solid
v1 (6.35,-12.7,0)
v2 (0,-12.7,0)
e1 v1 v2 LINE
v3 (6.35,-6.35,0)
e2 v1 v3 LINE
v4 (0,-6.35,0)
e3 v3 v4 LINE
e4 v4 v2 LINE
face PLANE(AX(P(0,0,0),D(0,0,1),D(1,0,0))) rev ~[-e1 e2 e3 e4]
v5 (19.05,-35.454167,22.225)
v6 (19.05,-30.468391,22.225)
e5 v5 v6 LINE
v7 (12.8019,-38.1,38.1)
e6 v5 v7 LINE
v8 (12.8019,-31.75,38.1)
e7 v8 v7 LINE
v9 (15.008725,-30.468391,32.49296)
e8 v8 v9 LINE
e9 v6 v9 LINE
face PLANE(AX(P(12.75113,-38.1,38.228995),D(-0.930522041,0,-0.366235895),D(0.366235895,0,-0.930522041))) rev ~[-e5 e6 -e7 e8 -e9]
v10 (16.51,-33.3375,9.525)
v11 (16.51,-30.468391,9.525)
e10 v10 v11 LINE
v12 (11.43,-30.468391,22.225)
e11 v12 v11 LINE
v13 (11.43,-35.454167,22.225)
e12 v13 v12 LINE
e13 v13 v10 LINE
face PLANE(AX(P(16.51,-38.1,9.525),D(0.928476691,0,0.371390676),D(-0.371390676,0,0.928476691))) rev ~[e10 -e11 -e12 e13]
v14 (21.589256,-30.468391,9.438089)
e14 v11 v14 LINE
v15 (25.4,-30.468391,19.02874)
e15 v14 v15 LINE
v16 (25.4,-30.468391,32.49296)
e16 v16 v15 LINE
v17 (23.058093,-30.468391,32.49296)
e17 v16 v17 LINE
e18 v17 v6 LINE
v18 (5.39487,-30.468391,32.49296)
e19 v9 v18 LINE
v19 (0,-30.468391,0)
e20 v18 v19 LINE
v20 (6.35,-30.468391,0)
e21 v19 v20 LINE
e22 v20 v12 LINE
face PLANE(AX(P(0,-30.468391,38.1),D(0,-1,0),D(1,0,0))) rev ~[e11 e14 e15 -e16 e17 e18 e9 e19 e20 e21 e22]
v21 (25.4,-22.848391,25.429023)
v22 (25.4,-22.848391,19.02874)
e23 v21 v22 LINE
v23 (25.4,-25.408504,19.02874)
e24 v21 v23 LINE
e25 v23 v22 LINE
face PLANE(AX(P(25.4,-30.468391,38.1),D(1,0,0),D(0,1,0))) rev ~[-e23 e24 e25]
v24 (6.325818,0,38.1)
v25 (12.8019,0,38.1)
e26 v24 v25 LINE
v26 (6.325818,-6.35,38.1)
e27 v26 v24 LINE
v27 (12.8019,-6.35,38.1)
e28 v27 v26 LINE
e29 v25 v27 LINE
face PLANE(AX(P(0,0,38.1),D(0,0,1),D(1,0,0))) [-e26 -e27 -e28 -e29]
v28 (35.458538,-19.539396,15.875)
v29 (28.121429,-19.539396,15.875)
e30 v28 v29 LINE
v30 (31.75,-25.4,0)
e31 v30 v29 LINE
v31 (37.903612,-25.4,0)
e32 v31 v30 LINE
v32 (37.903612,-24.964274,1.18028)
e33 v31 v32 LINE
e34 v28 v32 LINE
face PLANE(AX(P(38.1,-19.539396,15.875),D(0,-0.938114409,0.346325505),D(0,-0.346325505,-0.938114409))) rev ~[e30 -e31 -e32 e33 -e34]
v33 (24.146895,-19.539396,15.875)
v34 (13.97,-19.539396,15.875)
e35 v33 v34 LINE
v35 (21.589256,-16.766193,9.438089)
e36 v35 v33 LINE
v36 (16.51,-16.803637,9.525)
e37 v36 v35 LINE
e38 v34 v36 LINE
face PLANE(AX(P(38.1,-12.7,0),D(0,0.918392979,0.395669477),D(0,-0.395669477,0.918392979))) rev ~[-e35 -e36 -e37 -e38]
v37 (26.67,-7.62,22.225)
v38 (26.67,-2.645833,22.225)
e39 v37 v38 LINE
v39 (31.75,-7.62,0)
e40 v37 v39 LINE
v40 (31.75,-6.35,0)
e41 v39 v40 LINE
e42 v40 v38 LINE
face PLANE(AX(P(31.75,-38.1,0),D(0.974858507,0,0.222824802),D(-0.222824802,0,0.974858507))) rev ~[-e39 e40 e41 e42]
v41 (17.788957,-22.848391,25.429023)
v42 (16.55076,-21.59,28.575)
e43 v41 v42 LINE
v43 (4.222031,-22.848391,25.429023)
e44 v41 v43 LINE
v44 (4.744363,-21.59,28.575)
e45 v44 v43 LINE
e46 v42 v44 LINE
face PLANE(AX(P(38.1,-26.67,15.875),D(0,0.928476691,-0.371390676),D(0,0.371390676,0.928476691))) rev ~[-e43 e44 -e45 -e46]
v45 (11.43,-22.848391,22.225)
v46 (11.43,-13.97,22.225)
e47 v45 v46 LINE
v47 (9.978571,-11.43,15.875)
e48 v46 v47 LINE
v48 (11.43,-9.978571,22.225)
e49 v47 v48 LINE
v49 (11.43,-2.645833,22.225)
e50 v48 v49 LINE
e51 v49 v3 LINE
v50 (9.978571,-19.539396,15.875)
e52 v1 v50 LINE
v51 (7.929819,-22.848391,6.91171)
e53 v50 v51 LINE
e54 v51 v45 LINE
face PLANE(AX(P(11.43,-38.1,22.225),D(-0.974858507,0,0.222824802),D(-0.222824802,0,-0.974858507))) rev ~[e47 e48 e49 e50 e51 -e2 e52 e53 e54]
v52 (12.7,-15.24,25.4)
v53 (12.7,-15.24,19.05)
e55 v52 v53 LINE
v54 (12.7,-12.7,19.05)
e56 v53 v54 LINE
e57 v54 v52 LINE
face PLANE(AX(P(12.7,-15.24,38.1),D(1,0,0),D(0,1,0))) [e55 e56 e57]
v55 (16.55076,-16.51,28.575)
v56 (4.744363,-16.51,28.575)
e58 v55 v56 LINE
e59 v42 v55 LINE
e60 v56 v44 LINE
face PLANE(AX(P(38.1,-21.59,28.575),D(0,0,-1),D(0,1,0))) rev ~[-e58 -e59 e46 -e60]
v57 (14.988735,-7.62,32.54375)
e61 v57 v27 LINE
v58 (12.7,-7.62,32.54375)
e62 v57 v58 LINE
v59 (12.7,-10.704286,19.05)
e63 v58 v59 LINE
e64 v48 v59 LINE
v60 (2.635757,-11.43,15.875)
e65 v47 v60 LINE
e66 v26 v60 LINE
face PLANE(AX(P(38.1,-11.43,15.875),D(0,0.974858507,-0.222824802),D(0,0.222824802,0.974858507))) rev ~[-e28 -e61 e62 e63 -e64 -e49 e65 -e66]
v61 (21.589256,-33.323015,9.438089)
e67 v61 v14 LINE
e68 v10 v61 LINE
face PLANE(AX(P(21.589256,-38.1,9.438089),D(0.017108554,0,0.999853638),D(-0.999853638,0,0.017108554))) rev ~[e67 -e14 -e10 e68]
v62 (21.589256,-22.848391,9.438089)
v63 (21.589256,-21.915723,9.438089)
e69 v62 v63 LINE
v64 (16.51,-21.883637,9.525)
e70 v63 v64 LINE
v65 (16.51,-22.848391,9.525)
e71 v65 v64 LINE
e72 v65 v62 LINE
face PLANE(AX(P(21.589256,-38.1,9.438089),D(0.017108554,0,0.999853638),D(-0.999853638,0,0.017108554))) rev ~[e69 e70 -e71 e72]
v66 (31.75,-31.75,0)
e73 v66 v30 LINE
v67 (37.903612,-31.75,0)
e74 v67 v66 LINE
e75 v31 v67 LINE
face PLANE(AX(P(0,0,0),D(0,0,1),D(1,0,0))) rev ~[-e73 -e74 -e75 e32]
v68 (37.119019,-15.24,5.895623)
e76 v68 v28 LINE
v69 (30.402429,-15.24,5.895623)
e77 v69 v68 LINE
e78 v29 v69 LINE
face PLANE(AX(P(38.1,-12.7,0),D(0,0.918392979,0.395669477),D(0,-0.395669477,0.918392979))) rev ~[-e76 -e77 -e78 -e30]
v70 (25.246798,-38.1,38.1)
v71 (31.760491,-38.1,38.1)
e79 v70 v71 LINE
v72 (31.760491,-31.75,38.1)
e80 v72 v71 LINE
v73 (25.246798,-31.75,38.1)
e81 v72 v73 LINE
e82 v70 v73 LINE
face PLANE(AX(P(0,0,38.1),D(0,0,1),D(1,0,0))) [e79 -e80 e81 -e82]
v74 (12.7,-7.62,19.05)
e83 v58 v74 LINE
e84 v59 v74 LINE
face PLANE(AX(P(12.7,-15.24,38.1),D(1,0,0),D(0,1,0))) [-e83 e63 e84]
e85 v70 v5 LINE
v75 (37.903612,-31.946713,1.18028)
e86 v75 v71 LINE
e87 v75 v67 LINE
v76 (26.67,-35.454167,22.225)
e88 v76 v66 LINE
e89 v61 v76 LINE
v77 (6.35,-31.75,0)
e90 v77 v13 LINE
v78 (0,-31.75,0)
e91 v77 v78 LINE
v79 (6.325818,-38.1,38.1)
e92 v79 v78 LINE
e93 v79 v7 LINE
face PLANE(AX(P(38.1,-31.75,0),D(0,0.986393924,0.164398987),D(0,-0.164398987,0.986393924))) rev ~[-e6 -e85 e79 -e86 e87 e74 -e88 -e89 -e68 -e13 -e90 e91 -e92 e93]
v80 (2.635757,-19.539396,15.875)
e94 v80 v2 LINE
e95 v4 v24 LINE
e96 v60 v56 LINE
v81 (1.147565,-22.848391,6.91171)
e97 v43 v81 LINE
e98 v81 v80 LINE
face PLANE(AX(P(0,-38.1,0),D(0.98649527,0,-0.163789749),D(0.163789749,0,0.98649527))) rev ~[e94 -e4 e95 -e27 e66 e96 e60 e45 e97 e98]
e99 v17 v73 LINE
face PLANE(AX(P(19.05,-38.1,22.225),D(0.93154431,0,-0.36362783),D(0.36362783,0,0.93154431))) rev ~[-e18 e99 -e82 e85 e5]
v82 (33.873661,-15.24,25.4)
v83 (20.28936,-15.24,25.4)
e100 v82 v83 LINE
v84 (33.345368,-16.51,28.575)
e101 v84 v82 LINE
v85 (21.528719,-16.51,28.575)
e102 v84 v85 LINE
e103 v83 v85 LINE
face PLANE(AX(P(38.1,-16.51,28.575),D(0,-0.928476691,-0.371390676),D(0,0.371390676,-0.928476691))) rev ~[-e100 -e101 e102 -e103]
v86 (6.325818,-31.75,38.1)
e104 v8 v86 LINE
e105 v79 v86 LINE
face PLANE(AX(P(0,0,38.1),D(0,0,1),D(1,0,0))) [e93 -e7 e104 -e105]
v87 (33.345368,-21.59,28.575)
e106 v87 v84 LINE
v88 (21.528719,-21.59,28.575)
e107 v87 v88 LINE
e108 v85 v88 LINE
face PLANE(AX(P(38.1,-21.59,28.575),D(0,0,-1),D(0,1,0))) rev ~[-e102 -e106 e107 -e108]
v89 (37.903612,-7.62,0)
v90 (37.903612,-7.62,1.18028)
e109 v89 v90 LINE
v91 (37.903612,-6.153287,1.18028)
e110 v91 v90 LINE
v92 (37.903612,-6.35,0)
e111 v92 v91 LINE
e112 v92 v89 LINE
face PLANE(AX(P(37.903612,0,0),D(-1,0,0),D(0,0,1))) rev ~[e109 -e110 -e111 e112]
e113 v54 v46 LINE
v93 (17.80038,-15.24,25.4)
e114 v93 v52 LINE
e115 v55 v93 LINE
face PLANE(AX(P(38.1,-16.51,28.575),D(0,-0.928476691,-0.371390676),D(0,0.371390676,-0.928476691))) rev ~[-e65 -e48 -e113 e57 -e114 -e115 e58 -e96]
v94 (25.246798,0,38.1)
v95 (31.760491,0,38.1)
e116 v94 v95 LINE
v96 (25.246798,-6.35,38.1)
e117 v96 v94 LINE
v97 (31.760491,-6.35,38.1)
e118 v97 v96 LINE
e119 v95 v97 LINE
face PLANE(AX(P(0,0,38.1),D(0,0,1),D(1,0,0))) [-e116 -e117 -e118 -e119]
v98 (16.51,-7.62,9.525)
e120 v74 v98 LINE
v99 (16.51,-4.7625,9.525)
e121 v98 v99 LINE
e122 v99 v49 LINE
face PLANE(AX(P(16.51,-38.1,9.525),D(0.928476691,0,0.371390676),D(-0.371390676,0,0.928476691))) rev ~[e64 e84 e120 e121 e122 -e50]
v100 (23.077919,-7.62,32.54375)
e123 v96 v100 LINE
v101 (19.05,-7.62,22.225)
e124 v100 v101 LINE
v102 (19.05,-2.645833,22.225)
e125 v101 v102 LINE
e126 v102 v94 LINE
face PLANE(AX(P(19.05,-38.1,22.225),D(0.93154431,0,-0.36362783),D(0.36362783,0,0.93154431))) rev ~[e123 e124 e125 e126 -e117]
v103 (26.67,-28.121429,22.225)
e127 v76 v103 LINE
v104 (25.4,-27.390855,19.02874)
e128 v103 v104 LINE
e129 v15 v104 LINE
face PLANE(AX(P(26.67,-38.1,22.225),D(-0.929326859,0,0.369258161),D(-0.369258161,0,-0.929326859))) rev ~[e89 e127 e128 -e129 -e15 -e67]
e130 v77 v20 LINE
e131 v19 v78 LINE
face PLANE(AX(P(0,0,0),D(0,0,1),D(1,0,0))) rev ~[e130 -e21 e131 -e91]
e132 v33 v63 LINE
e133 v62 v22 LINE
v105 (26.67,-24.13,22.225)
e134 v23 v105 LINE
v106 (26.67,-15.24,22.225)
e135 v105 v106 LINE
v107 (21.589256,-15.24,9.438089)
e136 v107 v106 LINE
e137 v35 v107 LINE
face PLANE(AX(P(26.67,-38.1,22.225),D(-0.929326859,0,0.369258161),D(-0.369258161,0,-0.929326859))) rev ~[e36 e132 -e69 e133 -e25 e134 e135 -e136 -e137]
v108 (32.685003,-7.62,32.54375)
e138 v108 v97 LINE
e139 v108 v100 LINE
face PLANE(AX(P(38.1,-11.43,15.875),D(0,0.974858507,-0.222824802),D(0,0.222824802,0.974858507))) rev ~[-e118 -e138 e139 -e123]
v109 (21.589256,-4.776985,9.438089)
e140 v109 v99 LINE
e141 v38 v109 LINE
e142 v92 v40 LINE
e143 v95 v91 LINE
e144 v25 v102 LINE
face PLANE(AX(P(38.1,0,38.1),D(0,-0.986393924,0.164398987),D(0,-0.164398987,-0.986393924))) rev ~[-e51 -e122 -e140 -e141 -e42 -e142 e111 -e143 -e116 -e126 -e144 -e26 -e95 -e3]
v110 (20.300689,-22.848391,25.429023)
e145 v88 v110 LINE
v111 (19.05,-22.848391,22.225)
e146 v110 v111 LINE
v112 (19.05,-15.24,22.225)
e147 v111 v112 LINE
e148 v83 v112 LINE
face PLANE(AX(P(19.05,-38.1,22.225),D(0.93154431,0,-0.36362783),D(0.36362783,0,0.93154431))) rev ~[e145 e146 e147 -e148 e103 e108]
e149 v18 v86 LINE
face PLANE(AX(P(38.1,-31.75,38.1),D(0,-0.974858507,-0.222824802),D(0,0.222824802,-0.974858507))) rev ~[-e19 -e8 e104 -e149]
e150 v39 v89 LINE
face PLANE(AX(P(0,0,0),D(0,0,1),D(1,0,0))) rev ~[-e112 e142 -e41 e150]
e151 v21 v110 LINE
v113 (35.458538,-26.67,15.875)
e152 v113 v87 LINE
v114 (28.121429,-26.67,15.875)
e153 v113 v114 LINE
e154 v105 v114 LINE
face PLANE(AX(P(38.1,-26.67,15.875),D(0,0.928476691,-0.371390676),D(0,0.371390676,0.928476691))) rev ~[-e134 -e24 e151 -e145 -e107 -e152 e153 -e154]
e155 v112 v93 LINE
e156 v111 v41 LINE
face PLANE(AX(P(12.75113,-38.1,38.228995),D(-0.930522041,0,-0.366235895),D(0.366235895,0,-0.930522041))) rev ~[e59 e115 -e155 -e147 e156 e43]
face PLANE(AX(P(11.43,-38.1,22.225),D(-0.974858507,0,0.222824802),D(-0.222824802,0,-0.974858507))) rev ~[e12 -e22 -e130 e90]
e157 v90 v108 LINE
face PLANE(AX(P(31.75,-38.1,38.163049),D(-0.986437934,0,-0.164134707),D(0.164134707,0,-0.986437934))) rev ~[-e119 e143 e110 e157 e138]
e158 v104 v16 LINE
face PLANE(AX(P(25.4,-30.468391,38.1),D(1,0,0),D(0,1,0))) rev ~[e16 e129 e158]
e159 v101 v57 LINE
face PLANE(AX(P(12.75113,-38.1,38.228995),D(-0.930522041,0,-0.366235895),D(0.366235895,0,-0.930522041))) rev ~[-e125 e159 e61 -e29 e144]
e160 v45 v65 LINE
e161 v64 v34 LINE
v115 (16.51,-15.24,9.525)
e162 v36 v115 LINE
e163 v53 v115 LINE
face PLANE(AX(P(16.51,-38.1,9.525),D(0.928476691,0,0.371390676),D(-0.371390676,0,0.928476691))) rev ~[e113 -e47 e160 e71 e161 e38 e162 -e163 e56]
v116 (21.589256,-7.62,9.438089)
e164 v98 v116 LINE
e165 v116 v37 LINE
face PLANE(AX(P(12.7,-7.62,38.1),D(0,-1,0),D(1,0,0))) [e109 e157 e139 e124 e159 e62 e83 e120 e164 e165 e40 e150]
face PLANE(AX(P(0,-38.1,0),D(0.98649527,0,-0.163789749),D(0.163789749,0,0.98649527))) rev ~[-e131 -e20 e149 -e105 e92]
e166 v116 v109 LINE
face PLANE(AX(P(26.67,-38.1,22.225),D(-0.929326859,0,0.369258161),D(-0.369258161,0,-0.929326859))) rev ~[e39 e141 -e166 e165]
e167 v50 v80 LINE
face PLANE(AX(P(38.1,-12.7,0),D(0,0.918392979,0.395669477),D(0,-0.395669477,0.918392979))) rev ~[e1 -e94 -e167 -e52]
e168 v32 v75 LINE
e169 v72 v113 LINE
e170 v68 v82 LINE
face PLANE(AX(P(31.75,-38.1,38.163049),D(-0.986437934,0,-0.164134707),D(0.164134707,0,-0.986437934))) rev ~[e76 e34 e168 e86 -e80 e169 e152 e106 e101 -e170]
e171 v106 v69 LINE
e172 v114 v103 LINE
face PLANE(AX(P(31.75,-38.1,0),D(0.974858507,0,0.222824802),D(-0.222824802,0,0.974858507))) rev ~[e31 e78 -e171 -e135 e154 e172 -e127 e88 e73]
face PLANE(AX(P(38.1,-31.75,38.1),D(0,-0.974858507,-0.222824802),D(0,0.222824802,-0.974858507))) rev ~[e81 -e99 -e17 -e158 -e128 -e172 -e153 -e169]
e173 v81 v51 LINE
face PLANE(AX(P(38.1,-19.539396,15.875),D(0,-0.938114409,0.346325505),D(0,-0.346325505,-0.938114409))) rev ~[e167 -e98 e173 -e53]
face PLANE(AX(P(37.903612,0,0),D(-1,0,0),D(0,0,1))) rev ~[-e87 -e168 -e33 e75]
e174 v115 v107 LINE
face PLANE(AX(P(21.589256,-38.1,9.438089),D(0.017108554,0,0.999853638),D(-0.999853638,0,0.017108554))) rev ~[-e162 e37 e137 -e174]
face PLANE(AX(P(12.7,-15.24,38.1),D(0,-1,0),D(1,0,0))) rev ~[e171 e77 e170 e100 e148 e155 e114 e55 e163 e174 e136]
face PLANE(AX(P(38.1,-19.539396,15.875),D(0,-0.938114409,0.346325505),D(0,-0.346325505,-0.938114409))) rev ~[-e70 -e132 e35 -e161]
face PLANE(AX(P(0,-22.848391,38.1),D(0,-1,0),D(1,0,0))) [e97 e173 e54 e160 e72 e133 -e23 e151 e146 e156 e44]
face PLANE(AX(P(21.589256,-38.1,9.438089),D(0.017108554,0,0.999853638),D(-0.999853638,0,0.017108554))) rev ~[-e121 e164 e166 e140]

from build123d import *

# Parameters (mm, degrees)
F0_W      = 37.9036115915
F0_H      = 38.1
F1_DEPTH  = 38.1
F6_DEPTH  = 38.1
F8_DEPTH  = 38.1
F9_W      = 25.4
F9_H      = 7.62
F10_DEPTH = 38.1


# Not quite as in the source:
# - a feature names something its author has since deleted; it is built from what else it names


with BuildPart() as f1:
    # F0 (on Front) → F1 (new body)
    with BuildSketch(Plane.XZ):
        with Locations((18.9518057957, 19.05)):
            Rectangle(F0_W, F0_H)
    extrude(amount=F1_DEPTH)

    # F5 (on offset) → F6 (cut)
    with BuildSketch(Plane.YZ.offset(38.1)):
        Polygon((-6.35, 38.1), (-31.75, 38.1), (-26.67, 15.875), (-21.59, 28.575), (-16.51, 28.575), (-11.43, 15.875), align=None)
        Polygon((-31.75, 0), (-38.1, 38.1), (-38.1, 0), align=None)
        Polygon((-19.5393956542, 15.875), (-25.4, 0), (-12.7, 0), align=None)
        Polygon((0, 0), (0, 38.1), (-6.35, 0), align=None)
    extrude(amount=-F6_DEPTH, mode=Mode.SUBTRACT)

    # F7 (on offset) → F8 (cut)
    with BuildSketch(Plane.XZ.offset(38.1)):
        Polygon((25.2844232855, 38.196389037), (12.7511301009, 38.2289945719), (19.05, 22.225), align=None)
        Polygon((11.43, 22.225), (6.35, 0), (31.75, 0), (26.67, 22.225), (21.589256481, 9.4380885469), (16.51, 9.525), align=None)
        Polygon((38.1, 38.1630491376), (31.7472500896, 38.179575904), (31.75, 38.1630491376), (38.1, 0), align=None)
        Polygon((6.35, 38.2456472001), (0, 38.2621668126), (0, 0), align=None)
    extrude(amount=-F8_DEPTH, mode=Mode.SUBTRACT)

    # F9 (on offset) → F10 (cut)
    with BuildSketch(Plane.XY.offset(38.1)):
        with Locations((25.4, -11.43)):
            Rectangle(F9_W, F9_H)
        with Locations((12.7, -26.6583908668)):
            Rectangle(F9_W, F9_H)
    extrude(amount=-F10_DEPTH, mode=Mode.SUBTRACT)


solid = f1.part
